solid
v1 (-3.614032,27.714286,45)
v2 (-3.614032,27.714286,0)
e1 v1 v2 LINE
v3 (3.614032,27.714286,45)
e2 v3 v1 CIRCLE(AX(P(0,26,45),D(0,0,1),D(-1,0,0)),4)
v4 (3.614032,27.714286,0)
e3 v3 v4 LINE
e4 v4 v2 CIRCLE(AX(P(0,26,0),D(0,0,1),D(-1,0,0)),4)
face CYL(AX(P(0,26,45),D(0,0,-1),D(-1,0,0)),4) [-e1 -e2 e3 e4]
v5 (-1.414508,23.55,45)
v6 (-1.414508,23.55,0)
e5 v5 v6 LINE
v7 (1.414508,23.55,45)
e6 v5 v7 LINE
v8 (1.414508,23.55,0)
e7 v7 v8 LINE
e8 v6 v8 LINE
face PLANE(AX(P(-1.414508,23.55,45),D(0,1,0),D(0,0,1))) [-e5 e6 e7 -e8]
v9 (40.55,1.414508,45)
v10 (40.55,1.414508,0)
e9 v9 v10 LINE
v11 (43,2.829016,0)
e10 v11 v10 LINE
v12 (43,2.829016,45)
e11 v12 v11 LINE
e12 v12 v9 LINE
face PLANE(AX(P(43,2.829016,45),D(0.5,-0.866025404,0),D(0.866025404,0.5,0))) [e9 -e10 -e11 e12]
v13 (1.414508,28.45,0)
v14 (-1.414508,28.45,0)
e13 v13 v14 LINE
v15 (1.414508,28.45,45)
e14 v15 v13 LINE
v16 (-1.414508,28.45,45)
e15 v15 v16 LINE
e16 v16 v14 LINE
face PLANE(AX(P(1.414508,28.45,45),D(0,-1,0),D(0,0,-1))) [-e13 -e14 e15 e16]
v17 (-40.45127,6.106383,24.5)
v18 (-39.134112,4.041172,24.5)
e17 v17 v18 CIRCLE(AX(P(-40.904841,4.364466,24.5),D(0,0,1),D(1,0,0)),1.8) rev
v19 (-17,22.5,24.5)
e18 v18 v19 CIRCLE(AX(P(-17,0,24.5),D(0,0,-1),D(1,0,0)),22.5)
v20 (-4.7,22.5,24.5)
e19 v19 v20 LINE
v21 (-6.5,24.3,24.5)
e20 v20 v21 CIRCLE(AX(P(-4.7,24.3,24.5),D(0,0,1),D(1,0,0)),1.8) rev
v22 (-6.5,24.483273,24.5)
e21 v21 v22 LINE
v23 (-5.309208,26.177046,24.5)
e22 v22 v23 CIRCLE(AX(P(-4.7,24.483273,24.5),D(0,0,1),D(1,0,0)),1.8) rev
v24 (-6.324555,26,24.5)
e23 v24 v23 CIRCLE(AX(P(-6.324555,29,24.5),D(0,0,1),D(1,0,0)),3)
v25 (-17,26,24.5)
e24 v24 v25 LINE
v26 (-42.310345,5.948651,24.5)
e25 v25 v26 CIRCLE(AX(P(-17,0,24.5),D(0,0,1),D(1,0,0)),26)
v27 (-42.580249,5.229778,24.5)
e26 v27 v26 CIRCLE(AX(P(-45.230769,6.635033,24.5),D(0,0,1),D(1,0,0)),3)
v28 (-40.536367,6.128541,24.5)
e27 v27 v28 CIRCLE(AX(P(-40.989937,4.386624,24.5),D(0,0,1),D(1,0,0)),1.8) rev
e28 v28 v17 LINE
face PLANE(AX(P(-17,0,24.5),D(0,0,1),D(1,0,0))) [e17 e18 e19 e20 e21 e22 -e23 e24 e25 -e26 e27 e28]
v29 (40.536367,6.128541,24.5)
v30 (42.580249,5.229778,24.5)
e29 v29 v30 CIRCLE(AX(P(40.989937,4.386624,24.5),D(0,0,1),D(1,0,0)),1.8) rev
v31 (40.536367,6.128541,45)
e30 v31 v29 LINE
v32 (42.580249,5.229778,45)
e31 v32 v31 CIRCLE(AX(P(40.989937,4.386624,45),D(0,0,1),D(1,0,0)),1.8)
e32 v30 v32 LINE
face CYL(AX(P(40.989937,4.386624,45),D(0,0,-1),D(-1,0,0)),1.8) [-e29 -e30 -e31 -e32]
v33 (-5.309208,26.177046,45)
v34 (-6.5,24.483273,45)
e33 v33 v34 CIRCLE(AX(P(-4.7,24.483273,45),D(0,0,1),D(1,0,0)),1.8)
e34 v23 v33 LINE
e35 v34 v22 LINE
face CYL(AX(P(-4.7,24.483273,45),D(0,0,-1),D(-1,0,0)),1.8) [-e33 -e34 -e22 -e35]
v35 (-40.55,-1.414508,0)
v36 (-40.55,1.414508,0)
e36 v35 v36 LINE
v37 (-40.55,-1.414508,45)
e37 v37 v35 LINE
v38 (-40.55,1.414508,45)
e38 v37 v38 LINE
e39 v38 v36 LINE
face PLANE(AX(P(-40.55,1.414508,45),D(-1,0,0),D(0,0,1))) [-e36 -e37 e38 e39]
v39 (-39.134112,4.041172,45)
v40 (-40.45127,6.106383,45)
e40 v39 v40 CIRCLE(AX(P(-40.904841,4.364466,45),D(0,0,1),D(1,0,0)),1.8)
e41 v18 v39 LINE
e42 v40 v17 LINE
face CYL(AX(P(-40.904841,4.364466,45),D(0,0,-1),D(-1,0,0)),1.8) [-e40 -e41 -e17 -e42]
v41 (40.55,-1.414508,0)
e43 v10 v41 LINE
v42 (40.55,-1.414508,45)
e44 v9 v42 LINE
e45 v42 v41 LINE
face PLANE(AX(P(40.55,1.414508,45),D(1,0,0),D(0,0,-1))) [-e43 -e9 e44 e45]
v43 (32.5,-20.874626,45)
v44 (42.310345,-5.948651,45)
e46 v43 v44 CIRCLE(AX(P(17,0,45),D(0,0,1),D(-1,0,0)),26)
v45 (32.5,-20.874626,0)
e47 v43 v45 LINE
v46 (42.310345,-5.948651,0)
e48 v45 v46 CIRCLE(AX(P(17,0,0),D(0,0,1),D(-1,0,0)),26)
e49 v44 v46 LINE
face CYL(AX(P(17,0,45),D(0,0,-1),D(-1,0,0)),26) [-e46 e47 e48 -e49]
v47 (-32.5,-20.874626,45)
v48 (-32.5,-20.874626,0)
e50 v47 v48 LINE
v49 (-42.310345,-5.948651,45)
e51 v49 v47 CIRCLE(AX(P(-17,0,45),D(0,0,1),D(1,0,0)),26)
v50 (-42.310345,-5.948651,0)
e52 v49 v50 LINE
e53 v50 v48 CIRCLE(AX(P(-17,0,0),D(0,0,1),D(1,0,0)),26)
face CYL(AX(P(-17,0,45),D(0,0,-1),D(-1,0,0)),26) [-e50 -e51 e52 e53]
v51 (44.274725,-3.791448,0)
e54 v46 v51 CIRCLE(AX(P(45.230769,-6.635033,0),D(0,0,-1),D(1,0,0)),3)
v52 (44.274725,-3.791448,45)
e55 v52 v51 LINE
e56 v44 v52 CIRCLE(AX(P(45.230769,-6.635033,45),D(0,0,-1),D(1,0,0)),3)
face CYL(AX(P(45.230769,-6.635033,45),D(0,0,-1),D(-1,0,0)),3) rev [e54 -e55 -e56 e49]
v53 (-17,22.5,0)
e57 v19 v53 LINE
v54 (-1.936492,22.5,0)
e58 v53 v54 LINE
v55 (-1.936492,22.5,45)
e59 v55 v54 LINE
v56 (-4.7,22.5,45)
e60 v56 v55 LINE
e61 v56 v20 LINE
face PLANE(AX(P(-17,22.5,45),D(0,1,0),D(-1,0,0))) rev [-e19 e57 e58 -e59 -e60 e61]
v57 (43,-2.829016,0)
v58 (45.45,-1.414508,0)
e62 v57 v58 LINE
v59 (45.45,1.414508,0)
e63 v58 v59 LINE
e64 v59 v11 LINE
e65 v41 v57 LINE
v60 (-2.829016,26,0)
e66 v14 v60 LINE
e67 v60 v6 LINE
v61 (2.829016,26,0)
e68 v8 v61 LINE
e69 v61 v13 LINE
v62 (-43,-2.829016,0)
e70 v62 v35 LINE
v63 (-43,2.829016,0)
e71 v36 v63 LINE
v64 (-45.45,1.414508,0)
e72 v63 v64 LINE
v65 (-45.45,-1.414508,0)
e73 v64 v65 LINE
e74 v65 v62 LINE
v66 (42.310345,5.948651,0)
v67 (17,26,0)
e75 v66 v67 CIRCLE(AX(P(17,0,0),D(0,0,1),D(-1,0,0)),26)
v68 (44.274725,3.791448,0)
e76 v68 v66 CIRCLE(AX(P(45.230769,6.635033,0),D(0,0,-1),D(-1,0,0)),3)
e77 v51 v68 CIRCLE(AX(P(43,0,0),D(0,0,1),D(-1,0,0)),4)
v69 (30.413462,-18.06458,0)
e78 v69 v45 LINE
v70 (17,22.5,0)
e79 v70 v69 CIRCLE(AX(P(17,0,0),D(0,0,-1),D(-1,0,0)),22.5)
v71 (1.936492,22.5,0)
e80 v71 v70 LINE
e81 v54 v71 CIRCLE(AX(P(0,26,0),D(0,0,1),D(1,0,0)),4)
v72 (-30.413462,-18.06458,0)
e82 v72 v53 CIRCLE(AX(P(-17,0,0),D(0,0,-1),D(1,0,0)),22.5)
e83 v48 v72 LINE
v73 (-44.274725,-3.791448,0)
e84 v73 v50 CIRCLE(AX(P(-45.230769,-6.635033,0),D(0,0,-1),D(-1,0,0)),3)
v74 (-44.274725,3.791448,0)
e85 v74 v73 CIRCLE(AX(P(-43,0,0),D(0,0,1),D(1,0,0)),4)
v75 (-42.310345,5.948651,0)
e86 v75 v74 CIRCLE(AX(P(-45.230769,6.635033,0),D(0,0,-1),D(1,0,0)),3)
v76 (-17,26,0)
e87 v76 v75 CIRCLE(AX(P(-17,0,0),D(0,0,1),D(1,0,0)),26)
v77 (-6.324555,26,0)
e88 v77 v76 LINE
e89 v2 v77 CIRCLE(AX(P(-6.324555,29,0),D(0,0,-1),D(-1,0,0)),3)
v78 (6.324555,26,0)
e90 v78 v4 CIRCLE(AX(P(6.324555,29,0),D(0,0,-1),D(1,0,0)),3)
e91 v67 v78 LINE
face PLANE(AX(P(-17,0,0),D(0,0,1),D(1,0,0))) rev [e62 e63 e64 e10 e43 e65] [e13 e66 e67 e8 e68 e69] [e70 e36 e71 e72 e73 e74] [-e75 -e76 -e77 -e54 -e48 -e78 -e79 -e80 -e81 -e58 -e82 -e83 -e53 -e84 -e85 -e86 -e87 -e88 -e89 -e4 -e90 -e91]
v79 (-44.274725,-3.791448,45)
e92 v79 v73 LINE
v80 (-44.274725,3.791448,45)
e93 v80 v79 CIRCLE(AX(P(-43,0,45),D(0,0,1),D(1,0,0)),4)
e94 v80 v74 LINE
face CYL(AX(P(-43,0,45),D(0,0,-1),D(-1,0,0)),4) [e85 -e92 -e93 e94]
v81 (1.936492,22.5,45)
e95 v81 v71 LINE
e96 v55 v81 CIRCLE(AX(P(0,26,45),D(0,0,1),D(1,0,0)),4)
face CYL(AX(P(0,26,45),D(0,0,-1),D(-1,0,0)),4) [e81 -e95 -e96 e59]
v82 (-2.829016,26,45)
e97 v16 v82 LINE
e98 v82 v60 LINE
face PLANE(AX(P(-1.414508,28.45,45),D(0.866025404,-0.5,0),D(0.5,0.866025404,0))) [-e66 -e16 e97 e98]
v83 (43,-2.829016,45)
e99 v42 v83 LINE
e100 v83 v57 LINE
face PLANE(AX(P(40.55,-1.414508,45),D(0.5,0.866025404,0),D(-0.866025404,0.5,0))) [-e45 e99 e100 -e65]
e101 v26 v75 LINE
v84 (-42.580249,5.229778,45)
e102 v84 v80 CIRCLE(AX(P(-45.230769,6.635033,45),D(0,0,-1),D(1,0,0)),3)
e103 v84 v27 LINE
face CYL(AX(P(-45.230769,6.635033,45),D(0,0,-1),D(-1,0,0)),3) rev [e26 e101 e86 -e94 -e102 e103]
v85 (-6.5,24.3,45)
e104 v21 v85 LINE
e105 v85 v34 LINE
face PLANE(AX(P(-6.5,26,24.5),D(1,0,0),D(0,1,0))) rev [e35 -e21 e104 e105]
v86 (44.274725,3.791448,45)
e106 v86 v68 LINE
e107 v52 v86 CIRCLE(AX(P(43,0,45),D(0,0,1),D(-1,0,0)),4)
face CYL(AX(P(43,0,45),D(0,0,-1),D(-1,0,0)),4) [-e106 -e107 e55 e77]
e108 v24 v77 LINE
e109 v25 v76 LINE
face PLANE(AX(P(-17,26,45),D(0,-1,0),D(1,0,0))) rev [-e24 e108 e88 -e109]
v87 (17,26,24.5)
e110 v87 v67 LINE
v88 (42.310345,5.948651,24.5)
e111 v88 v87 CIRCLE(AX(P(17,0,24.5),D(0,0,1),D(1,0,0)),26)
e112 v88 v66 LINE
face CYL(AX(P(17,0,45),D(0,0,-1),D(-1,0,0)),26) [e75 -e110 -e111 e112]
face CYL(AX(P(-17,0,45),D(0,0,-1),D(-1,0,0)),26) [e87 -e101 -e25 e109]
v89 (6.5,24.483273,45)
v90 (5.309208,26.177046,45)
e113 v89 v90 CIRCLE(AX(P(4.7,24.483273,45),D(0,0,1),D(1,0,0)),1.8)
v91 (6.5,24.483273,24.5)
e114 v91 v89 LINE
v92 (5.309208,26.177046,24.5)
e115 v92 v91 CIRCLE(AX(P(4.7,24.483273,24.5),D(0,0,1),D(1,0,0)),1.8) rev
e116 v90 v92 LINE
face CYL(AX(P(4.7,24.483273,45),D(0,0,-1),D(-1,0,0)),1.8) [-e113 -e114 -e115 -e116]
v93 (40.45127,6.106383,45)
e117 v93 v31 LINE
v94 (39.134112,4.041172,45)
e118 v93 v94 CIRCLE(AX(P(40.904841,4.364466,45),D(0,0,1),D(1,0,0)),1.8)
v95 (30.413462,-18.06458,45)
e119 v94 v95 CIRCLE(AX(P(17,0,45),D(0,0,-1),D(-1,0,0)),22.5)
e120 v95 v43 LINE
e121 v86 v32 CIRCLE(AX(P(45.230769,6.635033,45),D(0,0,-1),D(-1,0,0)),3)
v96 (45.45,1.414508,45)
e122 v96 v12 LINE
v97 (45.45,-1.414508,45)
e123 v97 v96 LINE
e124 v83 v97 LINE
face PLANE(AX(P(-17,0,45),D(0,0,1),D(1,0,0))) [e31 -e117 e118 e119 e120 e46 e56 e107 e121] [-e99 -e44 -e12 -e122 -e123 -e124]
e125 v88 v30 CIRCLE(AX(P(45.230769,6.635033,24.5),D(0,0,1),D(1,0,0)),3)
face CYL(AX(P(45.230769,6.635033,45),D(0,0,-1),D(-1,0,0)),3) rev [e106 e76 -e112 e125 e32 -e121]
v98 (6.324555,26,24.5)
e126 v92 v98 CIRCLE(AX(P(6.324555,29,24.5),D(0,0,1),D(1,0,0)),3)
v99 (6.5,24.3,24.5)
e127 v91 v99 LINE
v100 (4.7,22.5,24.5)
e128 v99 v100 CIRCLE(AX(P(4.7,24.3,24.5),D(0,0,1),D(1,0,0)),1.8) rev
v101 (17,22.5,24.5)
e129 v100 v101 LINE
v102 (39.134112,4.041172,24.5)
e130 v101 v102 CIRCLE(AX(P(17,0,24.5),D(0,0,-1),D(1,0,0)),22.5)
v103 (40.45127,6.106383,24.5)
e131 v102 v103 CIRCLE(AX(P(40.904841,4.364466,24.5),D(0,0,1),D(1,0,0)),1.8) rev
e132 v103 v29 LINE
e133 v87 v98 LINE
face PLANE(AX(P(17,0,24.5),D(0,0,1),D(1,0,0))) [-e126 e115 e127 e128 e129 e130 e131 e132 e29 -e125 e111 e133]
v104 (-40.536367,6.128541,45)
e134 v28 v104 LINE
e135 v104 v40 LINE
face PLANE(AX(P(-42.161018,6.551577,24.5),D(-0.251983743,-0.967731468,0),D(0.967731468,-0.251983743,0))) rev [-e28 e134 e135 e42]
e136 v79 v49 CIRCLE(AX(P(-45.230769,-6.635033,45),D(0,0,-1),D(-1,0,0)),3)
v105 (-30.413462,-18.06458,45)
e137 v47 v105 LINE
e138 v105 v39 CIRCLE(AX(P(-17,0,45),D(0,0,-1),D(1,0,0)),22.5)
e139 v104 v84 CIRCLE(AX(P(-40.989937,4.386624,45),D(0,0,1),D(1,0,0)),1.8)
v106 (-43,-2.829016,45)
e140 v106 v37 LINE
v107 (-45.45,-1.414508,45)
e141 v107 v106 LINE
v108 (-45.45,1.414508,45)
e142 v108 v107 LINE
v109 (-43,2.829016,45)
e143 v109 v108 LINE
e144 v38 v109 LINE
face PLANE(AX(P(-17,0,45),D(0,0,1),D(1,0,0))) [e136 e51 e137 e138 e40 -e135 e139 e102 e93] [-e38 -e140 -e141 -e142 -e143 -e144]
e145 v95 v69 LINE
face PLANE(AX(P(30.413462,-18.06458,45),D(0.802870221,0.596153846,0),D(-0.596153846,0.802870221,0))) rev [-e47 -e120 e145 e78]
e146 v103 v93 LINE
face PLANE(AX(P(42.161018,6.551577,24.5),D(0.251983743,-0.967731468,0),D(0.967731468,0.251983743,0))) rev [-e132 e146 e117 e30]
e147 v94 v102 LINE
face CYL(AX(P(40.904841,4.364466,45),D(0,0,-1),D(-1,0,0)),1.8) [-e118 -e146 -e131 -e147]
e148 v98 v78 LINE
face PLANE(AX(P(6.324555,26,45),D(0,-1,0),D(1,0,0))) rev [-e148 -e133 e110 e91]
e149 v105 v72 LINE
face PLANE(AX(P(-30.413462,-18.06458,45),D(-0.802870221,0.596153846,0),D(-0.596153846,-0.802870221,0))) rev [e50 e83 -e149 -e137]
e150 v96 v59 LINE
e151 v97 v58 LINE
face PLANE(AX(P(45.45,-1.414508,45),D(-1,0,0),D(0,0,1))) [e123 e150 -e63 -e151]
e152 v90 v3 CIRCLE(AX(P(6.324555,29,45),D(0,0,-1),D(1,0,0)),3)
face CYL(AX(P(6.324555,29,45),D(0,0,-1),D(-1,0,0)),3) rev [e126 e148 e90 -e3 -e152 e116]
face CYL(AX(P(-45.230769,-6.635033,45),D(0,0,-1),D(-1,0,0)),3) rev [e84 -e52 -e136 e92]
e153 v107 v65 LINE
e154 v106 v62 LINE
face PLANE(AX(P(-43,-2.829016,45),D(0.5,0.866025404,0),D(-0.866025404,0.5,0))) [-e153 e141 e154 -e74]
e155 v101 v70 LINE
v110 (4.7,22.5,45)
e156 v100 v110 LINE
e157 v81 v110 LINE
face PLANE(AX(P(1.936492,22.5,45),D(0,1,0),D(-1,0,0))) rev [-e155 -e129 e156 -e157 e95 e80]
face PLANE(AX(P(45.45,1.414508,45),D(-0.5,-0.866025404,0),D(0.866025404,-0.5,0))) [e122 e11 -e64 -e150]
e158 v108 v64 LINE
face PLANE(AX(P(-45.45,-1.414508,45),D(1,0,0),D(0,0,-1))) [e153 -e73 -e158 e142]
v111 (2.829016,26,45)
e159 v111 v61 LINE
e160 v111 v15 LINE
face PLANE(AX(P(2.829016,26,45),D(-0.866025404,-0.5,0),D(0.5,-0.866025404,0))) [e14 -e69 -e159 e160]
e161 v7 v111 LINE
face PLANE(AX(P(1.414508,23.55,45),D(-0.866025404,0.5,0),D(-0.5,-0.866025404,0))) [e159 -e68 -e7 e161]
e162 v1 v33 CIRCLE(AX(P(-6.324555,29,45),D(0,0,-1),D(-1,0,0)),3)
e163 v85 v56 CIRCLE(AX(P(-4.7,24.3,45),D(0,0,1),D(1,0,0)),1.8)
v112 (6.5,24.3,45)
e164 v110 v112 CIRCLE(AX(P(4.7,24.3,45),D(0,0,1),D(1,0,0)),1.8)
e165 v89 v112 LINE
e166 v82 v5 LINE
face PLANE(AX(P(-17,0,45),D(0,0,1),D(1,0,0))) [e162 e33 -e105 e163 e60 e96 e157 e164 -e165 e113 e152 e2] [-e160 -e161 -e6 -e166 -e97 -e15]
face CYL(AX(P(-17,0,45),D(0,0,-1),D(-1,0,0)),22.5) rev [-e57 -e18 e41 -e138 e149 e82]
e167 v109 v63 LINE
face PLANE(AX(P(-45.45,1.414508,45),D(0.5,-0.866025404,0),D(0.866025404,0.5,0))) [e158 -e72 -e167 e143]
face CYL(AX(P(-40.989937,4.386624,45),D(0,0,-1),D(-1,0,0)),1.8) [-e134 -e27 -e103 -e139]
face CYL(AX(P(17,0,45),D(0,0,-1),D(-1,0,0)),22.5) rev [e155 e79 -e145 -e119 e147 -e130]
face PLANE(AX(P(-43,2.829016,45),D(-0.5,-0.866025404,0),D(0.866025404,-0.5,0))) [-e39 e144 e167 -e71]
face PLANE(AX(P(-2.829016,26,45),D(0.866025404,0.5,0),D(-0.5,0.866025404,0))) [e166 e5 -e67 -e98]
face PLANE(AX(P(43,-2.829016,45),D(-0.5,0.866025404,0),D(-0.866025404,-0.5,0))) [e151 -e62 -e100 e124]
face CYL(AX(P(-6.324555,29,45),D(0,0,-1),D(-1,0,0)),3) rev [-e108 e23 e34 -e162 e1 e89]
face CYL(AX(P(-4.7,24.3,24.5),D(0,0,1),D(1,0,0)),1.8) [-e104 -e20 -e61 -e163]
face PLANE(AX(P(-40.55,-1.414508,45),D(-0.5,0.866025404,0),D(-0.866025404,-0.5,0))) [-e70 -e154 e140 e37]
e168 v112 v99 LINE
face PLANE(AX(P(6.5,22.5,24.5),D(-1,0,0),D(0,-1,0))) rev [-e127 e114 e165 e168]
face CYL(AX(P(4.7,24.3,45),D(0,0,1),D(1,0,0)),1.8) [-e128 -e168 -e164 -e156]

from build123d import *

# Parameters (mm, degrees)
EXTRUDE_1_DEPTH     = 45
CUT_EXTRUDE_START   = -20.5
CUT_EXTRUDE_1_DEPTH = 20.5
FILLET_1_R          = 1.8


with BuildPart() as part:
    # 草图2 → 凸台-拉伸1 (new body)
    with BuildSketch(Plane.XY):
        with BuildLine():
            Line((-17.000000000000004, 25.99999999999999), (-6.324555320336758, 25.999999999999996))
            ThreePointArc((-6.324555320336758, 25.999999999999996), (-4.720987868862212, 26.464537235814447), (-3.614031611621006, 27.71428571428571))
            ThreePointArc((-3.614031611621006, 27.71428571428571), (2.4e-16, 30), (3.614031611621006, 27.71428571428571))
            ThreePointArc((3.614031611621006, 27.71428571428571), (4.720987868862212, 26.464537235814447), (6.324555320336758, 25.999999999999996))
            Line((6.324555320336758, 25.999999999999996), (17.000000000000004, 25.99999999999999))
            ThreePointArc((17.000000000000004, 25.99999999999999), (33.14520180681835, 20.379707029717306), (42.310344827586206, 5.948650662854563))
            ThreePointArc((42.310344827586206, 5.948650662854563), (43.01263196777571, 4.615165346220191), (44.27472527472528, 3.7914476752259816))
            ThreePointArc((44.27472527472528, 3.7914476752259816), (47, -7.66e-15), (44.27472527472528, -3.791447675225999))
            ThreePointArc((44.27472527472528, -3.791447675225999), (43.01263196777571, -4.615165346220208), (42.310344827586206, -5.948650662854578))
            ThreePointArc((42.310344827586206, -5.948650662854578), (38.72710851162517, -14.280502642556568), (32.5, -20.874625745148098))
            Line((32.5, -20.874625745148098), (30.413461538461537, -18.064579971762782))
            ThreePointArc((30.413461538461537, -18.064579971762782), (38.36238574416096, 7.063885284860494), (17.000000000000007, 22.500000000000004))
            Line((17.000000000000007, 22.500000000000004), (1.9364916731037032, 22.499999999999996))
            ThreePointArc((1.9364916731037032, 22.499999999999996), (2.4e-16, 22), (-1.9364916731037032, 22.499999999999996))
            Line((-1.9364916731037032, 22.499999999999996), (-17.000000000000004, 22.500000000000004))
            ThreePointArc((-17.000000000000004, 22.500000000000004), (-38.36238574416096, 7.063885284860502), (-30.413461538461544, -18.064579971762775))
            Line((-30.413461538461544, -18.064579971762775), (-32.5, -20.874625745148098))
            ThreePointArc((-32.5, -20.874625745148098), (-38.727108511625175, -14.280502642556563), (-42.310344827586206, -5.948650662854575))
            ThreePointArc((-42.310344827586206, -5.948650662854575), (-43.01263196777571, -4.615165346220205), (-44.27472527472528, -3.7914476752259954))
            ThreePointArc((-44.27472527472528, -3.7914476752259954), (-46.99999999999999, -3.62e-15), (-44.27472527472527, 3.791447675225978))
            ThreePointArc((-44.27472527472527, 3.791447675225978), (-43.012631967775704, 4.615165346220189), (-42.310344827586206, 5.9486506628545595))
            ThreePointArc((-42.310344827586206, 5.9486506628545595), (-33.14520180681835, 20.379707029717306), (-17.000000000000004, 25.99999999999999))
        make_face()
        Polygon((1.414508159514589, 28.45), (-1.4145081595145819, 28.45), (-2.829016319029165, 26.000000000000004), (-1.4145081595145819, 23.549999999999997), (1.4145081595145816, 23.549999999999997), (2.829016319029169, 26.000000000000004), align=None, mode=Mode.SUBTRACT)
        Polygon((-43, -2.8290163190291664), (-45.44999999999999, -1.414508159514586), (-45.44999999999999, 1.4145081595145663), (-43, 2.8290163190291495), (-40.55, 1.4145081595145712), (-40.55, -1.414508159514584), align=None, mode=Mode.SUBTRACT)
        Polygon((45.44999999999999, -1.414508159514587), (45.44999999999999, 1.4145081595145672), (43, 2.8290163190291513), (40.55, 1.414508159514572), (40.55, -1.414508159514585), (43, -2.829016319029168), align=None, mode=Mode.SUBTRACT)
    extrude(amount=EXTRUDE_1_DEPTH)

    # 草图3 → 切除-拉伸1 (cut)
    with BuildSketch(Plane.XY.offset(45).offset(CUT_EXTRUDE_START)):
        with BuildLine():
            Line((-42.16101815897212, 6.551577306563255), (-38.773958022187415, 5.669634207602821))
            ThreePointArc((-38.773958022187415, 5.669634207602821), (-30.76014589909817, 17.801920818707508), (-17.000000000000004, 22.5))
            Line((-17.000000000000004, 22.5), (-6.499999999999999, 22.5))
            Line((-6.499999999999999, 22.5), (-6.500000000000001, 25.999999999999986))
            Line((-6.500000000000001, 25.999999999999986), (-17.000000000000004, 25.999999999999993))
            ThreePointArc((-17.000000000000004, 25.999999999999993), (-32.900613038957886, 20.57110850161755), (-42.16101815897212, 6.551577306563255))
        make_face()
        with BuildLine():
            Line((42.16101815897216, 6.551577306563108), (38.77395802218746, 5.669634207602693))
            ThreePointArc((38.77395802218746, 5.669634207602693), (30.760145899098227, 17.80192081870747), (17.000000000000007, 22.5))
            Line((17.000000000000007, 22.5), (6.500000000000001, 22.5))
            Line((6.500000000000001, 22.5), (6.500000000000003, 25.999999999999986))
            Line((6.500000000000003, 25.999999999999986), (17, 25.99999999999999))
            ThreePointArc((17, 25.99999999999999), (32.90061303895794, 20.57110850161751), (42.16101815897216, 6.551577306563108))
        make_face()
    extrude(amount=CUT_EXTRUDE_1_DEPTH, mode=Mode.SUBTRACT)

    # 圆角1
    # the kernel refuses this fillet: 1.8 mm, written as the material it takes off along each edge
    with BuildSketch(Plane(origin=(-6.499999999999999, 22.5, 24.5), x_dir=(-4.9e-16, 1, 0), z_dir=(0, 0, 1))) as fillet_1_piece_1:
        with BuildLine():
            CenterArc((FILLET_1_R, -FILLET_1_R), FILLET_1_R, 89.99999999999997, 89.99999999999997)
            Line((-4.44e-15, -FILLET_1_R), (0, 0))
            Line((0, 0), (FILLET_1_R, 0))
        make_face()
    extrude(amount=25, mode=Mode.SUBTRACT)
    with BuildSketch(Plane(origin=(-6.500000000000001, 25.999999999999986, 24.5), x_dir=(0.9891271990467642, 0.14706251767837725, 0), z_dir=(0, 0, 1))) as fillet_1_piece_2:
        with BuildLine():
            CenterArc((1.5573753123133534, -1.7649481565014509), FILLET_1_R, 101.3256751198377, 70.21759155918191)
            Line((-0.22305364597082192, -1.5002356246803719), (-0.4010965417992392, -1.473764371498264))
            Line((-0.4010965417992392, -1.473764371498264), (-0.17804289582841726, 0.02647125318210786))
            Line((-0.17804289582841726, 0.02647125318210786), (0.02647125318210786, 0.17804289582841726))
            ThreePointArc((0.02647125318210786, 0.17804289582841726), (0.2000083577650695, 0.15224155952387494), (1.168531917251559, 0.17649481565014538))
            Line((1.168531917251559, 0.17649481565014538), (1.203881316802631, -2e-17))
        make_face()
    extrude(amount=24.291816730260194, mode=Mode.SUBTRACT)
    with BuildSketch(Plane(origin=(6.500000000000001, 22.5, 24.5), x_dir=(-1, -1.97e-15, 0), z_dir=(0, 0, 1))) as fillet_1_piece_3:
        with BuildLine():
            CenterArc((FILLET_1_R, -FILLET_1_R), FILLET_1_R, 89.99999999999993, 89.99999999999996)
            Line((-4.44e-15, -FILLET_1_R), (0, 0))
            Line((0, 0), (FILLET_1_R, 0))
        make_face()
    extrude(amount=25, mode=Mode.SUBTRACT)
    with BuildSketch(Plane(origin=(6.500000000000003, 25.999999999999986, 24.5), x_dir=(-0.9891271990467642, 0.14706251767837714, 0), z_dir=(0, 0, 1))) as fillet_1_piece_4:
        with BuildLine():
            CenterArc((1.5573753123133545, 1.7649481565014509), FILLET_1_R, 188.4567333209804, 70.21759155918187)
            Line((-0.22305364597082086, 1.5002356246803719), (-0.40109654179923815, 1.4737643714982642))
            Line((-0.40109654179923815, 1.4737643714982642), (-0.17804289582841726, -0.02647125318210784))
            Line((-0.17804289582841726, -0.02647125318210784), (0.02647125318210784, -0.17804289582841726))
            ThreePointArc((0.02647125318210784, -0.17804289582841726), (0.20000835776506773, -0.15224155952387522), (1.1685319172515596, -0.17649481565014538))
            Line((1.1685319172515596, -0.17649481565014538), (1.2038813168026317, 2e-17))
        make_face()
    extrude(amount=24.291816730260194, mode=Mode.SUBTRACT)
    with BuildSketch(Plane(origin=(38.77395802218746, 5.669634207602693, 24.5), x_dir=(0.2159440686633983, -0.9764057349325113, 0), z_dir=(0, 0, 1))) as fillet_1_piece_5:
        with BuildLine():
            CenterArc((1.7345250396355076, 1.7987633090933175), FILLET_1_R, 182.12401133336417, 85.75197733327184)
            Line((-0.06423826945781225, 1.7320508075688776), (0, 0))
            ThreePointArc((0, 0), (0.8339062690555353, 0.01545863633349137), (1.6678125381110727, -6e-17))
        make_face()
    extrude(amount=24.83310408026317, mode=Mode.SUBTRACT)
    with BuildSketch(Plane(origin=(42.16101815897217, 6.551577306563109, 24.5), x_dir=(0.30232503982893916, -0.9532048941819542, 0), z_dir=(0, 0, 1))) as fillet_1_piece_6:
        with BuildLine():
            CenterArc((1.7095969183976014, -1.770799573138055), FILLET_1_R, 100.33438988529196, 76.6632370150231)
            Line((-0.08793234080970554, -1.6765204010286838), (-0.267685266730436, -1.667092483817746))
            Line((-0.267685266730436, -1.667092483817746), (-0.17975292592072528, 0.00942791721106288))
            Line((-0.17975292592072528, 0.00942791721106288), (0.00942791721106515, 0.17975292592072362))
            ThreePointArc((0.00942791721106515, 0.17975292592072362), (0.633577059222906, 0.1395355017085772), (1.3543993186778904, 0.1770799573138067))
            Line((1.3543993186778904, 0.1770799573138067), (1.3866900095614998, -3e-17))
        make_face()
    extrude(amount=24.697062031666952, mode=Mode.SUBTRACT)
    with BuildSketch(Plane(origin=(-38.773958022187415, 5.669634207602822, 24.5), x_dir=(-0.21594406866341104, -0.9764057349325085, 0), z_dir=(0, 0, 1))) as fillet_1_piece_7:
        with BuildLine():
            CenterArc((1.7345250396355227, -1.7987633090933188), FILLET_1_R, 92.12401133336449, 85.75197733327163)
            Line((-0.06423826945779765, -1.7320508075688876), (0, 0))
            ThreePointArc((0, 0), (0.8339062690555384, -0.01545863633350171), (1.6678125381110729, 3e-17))
        make_face()
    extrude(amount=24.833104080263197, mode=Mode.SUBTRACT)
    with BuildSketch(Plane(origin=(-42.16101815897213, 6.5515773065632565, 24.5), x_dir=(-0.30232503982891934, -0.9532048941819604, 0), z_dir=(0, 0, 1))) as fillet_1_piece_8:
        with BuildLine():
            CenterArc((1.7095969183976452, 1.770799573138059), FILLET_1_R, 183.00237309968935, 76.66323701501943)
            Line((-0.08793234080965445, 1.676520401028549), (-0.26768526673038506, 1.6670924838176002))
            Line((-0.26768526673038506, 1.6670924838176002), (-0.17975292592072462, -0.00942791721105888))
            Line((-0.17975292592072462, -0.00942791721105888), (0.00942791721106057, -0.1797529259207241))
            ThreePointArc((0.00942791721106057, -0.1797529259207241), (0.6335770592230675, -0.13953550170858298), (1.3543993186779588, -0.1770799573138045))
            Line((1.3543993186779588, -0.1770799573138045), (1.3866900095615668, 2e-17))
        make_face()
    extrude(amount=24.697062031666604, mode=Mode.SUBTRACT)


solid = part.part
